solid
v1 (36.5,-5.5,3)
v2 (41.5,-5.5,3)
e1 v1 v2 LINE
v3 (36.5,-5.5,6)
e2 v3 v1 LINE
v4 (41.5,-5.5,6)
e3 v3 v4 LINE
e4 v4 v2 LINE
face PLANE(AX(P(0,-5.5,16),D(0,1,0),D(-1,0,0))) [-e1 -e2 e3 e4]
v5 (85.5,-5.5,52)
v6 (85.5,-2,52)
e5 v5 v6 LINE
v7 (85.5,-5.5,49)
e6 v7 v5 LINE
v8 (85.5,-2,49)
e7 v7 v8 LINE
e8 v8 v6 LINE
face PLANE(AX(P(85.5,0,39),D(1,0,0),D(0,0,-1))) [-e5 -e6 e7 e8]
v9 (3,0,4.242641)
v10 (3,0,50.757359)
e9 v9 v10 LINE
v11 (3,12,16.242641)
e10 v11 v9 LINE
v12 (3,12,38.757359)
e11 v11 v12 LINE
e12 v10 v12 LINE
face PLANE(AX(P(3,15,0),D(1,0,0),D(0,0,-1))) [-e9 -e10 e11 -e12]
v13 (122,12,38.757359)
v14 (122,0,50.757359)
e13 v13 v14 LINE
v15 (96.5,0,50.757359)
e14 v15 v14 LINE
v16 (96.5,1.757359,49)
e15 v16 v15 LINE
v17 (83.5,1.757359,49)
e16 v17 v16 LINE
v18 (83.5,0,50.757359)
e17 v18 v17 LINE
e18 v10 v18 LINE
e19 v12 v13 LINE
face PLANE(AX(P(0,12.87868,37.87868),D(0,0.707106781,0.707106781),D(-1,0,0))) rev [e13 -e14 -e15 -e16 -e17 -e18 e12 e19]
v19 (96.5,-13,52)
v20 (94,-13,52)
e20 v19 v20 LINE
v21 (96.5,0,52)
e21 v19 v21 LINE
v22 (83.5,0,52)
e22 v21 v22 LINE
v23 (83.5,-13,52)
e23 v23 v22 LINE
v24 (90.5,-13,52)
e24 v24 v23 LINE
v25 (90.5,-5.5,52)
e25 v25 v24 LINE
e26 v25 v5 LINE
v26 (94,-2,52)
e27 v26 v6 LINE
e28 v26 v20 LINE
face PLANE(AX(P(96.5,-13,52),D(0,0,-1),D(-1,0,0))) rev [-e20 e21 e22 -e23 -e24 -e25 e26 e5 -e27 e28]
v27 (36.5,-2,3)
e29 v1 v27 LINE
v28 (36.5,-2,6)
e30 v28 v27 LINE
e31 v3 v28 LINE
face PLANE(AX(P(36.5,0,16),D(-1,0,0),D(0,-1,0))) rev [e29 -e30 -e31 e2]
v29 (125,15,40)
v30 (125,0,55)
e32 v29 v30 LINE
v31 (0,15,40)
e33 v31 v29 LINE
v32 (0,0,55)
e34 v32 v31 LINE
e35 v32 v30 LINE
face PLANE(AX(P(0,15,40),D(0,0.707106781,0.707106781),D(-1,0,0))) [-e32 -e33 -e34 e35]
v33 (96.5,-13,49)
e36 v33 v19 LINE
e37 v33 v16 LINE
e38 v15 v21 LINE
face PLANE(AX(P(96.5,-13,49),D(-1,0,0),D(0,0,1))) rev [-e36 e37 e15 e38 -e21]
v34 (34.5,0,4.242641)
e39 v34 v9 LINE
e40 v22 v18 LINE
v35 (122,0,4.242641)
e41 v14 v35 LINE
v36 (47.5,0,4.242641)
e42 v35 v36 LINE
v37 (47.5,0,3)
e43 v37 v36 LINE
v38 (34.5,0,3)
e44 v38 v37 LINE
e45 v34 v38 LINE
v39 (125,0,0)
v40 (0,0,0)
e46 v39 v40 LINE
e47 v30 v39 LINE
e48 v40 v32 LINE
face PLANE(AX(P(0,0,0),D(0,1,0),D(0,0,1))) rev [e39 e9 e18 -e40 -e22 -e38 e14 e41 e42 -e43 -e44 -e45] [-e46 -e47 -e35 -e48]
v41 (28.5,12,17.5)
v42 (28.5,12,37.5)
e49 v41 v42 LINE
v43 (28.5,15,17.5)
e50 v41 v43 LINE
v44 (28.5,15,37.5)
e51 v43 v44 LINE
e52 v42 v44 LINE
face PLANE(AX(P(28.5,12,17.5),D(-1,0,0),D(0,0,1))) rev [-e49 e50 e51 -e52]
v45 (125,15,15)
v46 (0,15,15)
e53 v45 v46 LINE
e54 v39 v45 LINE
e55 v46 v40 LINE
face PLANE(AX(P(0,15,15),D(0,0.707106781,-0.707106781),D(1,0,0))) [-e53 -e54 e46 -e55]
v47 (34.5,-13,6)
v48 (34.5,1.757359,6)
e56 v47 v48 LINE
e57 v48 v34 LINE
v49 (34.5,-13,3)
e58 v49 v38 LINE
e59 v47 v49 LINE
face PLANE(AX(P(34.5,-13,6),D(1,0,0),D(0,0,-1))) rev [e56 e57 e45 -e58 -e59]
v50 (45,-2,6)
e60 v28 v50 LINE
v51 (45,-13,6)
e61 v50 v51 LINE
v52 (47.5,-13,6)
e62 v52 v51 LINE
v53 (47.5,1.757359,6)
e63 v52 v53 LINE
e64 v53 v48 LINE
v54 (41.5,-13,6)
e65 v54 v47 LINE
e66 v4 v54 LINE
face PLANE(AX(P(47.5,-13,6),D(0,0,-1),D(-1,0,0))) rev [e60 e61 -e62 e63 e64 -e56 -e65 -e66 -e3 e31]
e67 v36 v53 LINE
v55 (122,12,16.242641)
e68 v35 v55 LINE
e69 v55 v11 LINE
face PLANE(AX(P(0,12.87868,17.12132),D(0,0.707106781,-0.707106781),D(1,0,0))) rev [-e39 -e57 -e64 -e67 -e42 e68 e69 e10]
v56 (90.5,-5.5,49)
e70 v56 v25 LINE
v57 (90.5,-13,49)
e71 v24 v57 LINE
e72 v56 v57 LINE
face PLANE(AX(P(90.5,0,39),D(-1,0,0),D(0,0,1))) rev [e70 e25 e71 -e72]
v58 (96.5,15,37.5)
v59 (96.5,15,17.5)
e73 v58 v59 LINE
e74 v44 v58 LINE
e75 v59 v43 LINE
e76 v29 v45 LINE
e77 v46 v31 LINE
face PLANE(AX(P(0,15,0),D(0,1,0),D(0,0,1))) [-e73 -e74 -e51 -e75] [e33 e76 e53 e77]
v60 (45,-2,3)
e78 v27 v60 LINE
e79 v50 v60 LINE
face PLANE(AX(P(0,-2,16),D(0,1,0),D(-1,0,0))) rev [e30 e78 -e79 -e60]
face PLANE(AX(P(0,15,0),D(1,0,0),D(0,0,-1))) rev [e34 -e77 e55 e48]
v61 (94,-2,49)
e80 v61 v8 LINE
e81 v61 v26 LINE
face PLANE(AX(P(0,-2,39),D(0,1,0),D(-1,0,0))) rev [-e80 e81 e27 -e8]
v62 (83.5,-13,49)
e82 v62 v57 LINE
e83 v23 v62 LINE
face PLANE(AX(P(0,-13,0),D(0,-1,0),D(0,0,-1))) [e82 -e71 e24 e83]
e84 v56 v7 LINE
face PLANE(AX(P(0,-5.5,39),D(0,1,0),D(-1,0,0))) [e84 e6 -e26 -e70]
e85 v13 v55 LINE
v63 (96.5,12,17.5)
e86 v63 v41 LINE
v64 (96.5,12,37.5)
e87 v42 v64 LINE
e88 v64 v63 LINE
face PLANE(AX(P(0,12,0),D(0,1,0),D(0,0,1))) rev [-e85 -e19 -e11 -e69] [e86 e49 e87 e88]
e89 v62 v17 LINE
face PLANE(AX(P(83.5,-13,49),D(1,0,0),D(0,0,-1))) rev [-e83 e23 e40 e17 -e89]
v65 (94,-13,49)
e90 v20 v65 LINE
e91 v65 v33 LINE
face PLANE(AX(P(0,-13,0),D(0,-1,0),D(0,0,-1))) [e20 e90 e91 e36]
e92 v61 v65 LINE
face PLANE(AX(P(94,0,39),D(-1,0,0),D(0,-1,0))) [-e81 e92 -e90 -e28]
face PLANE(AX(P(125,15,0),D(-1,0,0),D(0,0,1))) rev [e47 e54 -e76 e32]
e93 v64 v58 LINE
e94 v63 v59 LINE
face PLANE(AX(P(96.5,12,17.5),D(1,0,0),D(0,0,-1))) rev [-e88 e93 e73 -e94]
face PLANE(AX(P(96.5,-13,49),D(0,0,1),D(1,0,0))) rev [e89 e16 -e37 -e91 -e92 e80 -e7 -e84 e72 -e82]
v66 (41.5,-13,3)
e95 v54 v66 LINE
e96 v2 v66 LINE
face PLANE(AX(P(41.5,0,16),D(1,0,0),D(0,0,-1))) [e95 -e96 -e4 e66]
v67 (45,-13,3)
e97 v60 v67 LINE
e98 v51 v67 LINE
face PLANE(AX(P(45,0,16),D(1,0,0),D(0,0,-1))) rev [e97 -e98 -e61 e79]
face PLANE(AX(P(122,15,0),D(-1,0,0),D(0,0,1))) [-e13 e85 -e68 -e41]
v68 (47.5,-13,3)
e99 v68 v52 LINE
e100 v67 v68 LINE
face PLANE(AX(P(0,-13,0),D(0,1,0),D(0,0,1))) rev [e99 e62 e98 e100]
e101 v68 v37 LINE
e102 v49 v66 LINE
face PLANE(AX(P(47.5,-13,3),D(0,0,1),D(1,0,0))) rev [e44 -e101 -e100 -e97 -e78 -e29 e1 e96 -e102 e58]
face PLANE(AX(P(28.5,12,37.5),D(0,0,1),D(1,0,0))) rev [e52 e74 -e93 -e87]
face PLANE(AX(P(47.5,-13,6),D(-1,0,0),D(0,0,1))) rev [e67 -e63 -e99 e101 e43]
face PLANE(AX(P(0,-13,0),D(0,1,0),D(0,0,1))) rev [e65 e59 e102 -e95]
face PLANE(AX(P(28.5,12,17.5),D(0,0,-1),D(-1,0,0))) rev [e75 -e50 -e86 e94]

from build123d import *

# Parameters (mm, degrees)
SKETCH1_W           = 125
SKETCH1_H           = 55
BOSS_EXTRUDE1_DEPTH = 15
CHAMFER1_SIZE       = 15
SHELL1_START        = 3
SHELL1_DEPTH        = 119
SKETCH2_W           = 13
SKETCH2_H           = 3
BOSS_EXTRUDE3_DEPTH = 13
SKETCH3_W           = 3.5
SKETCH3_H           = 7.5
SKETCH3_W_2         = 8.5
SKETCH3_H_2         = 3.5
CUT_EXTRUDE1_DEPTH  = 13
SKETCH5_W           = 3.5
SKETCH5_H           = 7.5
SKETCH5_W_2         = 8.5
SKETCH5_H_2         = 3.5
CUT_EXTRUDE2_DEPTH  = 13
SKETCH6_W           = 68
SKETCH6_H           = 20
CUT_EXTRUDE3_DEPTH  = 3
SKETCH7_W           = 13
SKETCH7_H           = 1.757359313
BOSS_EXTRUDE4_DEPTH = 4
SKETCH8_W           = 13
SKETCH8_H           = 1.757359313
BOSS_EXTRUDE5_DEPTH = 4


# Read off the part's stored shape, not the designer's step: Shell1
with BuildPart() as part:
    # Sketch1 → Boss-Extrude1 (new body)
    with BuildSketch(Plane(origin=(0, 0, 0), x_dir=(1, 0, 0), z_dir=(0, 1, 0))):
        with Locations((62.5, -27.5)):
            Rectangle(SKETCH1_W, SKETCH1_H)
    extrude(amount=BOSS_EXTRUDE1_DEPTH)

    # Chamfer1
    chamfer1_edges = [part.edges().sort_by_distance(p)[0] for p in [
        (62.5, 15, 55),
        (62.5, 15, 0),
    ]]
    chamfer(chamfer1_edges, length=CHAMFER1_SIZE - 0.0001)  # a hair under: the kernel refuses the full size

    # Shell1 outline → Shell1 (cut)
    with BuildSketch(Plane.YZ.offset(SHELL1_START)):
        Polygon((0, 4.242640687), (12, 16.242640687), (12, 38.757359313), (0, 50.757359313), align=None)
    extrude(amount=SHELL1_DEPTH, mode=Mode.SUBTRACT)

    # Sketch2 → Boss-Extrude3 (add)
    with BuildSketch(Plane(origin=(0, 0, 0), x_dir=(-1, 0, 0), z_dir=(0, -1, 0))):
        with Locations((-41, -4.5)):
            Rectangle(SKETCH2_W, SKETCH2_H)
        with Locations((-90, -50.5)):
            Rectangle(SKETCH2_W, SKETCH2_H)
    extrude(amount=BOSS_EXTRUDE3_DEPTH)

    # Sketch3 → Cut-Extrude1 (cut)
    with BuildSketch(Plane.XY.offset(52)):
        with Locations((92.25, -9.25)):
            Rectangle(SKETCH3_W, SKETCH3_H)
        with Locations((89.75, -3.75)):
            Rectangle(SKETCH3_W_2, SKETCH3_H_2)
    extrude(amount=-CUT_EXTRUDE1_DEPTH, mode=Mode.SUBTRACT)

    # Sketch5 → Cut-Extrude2 (cut)
    with BuildSketch(Plane(origin=(0, 0, 3), x_dir=(-1, 0, 0), z_dir=(0, 0, -1))):
        with Locations((-43.25, -9.25)):
            Rectangle(SKETCH5_W, SKETCH5_H)
        with Locations((-40.75, -3.75)):
            Rectangle(SKETCH5_W_2, SKETCH5_H_2)
    extrude(amount=-CUT_EXTRUDE2_DEPTH, mode=Mode.SUBTRACT)

    # Sketch6 → Cut-Extrude3 (cut)
    with BuildSketch(Plane(origin=(0, 15, 0), x_dir=(1, 0, 0), z_dir=(0, 1, 0))):
        with Locations((62.5, -27.5)):
            Rectangle(SKETCH6_W, SKETCH6_H)
    extrude(amount=-CUT_EXTRUDE3_DEPTH, mode=Mode.SUBTRACT)

    # Sketch7 → Boss-Extrude4 (add)
    with BuildSketch(Plane(origin=(0, 0, 0), x_dir=(1, 0, 0), z_dir=(0, 1, 0))):
        with Locations((41, -5.121320344)):
            Rectangle(SKETCH7_W, SKETCH7_H)
    extrude(amount=BOSS_EXTRUDE4_DEPTH)

    # Sketch8 → Boss-Extrude5 (add)
    with BuildSketch(Plane(origin=(0, 0, 0), x_dir=(1, 0, 0), z_dir=(0, 1, 0))):
        with Locations((90, -49.878679656)):
            Rectangle(SKETCH8_W, SKETCH8_H)
    extrude(amount=BOSS_EXTRUDE5_DEPTH)


solid = part.part
